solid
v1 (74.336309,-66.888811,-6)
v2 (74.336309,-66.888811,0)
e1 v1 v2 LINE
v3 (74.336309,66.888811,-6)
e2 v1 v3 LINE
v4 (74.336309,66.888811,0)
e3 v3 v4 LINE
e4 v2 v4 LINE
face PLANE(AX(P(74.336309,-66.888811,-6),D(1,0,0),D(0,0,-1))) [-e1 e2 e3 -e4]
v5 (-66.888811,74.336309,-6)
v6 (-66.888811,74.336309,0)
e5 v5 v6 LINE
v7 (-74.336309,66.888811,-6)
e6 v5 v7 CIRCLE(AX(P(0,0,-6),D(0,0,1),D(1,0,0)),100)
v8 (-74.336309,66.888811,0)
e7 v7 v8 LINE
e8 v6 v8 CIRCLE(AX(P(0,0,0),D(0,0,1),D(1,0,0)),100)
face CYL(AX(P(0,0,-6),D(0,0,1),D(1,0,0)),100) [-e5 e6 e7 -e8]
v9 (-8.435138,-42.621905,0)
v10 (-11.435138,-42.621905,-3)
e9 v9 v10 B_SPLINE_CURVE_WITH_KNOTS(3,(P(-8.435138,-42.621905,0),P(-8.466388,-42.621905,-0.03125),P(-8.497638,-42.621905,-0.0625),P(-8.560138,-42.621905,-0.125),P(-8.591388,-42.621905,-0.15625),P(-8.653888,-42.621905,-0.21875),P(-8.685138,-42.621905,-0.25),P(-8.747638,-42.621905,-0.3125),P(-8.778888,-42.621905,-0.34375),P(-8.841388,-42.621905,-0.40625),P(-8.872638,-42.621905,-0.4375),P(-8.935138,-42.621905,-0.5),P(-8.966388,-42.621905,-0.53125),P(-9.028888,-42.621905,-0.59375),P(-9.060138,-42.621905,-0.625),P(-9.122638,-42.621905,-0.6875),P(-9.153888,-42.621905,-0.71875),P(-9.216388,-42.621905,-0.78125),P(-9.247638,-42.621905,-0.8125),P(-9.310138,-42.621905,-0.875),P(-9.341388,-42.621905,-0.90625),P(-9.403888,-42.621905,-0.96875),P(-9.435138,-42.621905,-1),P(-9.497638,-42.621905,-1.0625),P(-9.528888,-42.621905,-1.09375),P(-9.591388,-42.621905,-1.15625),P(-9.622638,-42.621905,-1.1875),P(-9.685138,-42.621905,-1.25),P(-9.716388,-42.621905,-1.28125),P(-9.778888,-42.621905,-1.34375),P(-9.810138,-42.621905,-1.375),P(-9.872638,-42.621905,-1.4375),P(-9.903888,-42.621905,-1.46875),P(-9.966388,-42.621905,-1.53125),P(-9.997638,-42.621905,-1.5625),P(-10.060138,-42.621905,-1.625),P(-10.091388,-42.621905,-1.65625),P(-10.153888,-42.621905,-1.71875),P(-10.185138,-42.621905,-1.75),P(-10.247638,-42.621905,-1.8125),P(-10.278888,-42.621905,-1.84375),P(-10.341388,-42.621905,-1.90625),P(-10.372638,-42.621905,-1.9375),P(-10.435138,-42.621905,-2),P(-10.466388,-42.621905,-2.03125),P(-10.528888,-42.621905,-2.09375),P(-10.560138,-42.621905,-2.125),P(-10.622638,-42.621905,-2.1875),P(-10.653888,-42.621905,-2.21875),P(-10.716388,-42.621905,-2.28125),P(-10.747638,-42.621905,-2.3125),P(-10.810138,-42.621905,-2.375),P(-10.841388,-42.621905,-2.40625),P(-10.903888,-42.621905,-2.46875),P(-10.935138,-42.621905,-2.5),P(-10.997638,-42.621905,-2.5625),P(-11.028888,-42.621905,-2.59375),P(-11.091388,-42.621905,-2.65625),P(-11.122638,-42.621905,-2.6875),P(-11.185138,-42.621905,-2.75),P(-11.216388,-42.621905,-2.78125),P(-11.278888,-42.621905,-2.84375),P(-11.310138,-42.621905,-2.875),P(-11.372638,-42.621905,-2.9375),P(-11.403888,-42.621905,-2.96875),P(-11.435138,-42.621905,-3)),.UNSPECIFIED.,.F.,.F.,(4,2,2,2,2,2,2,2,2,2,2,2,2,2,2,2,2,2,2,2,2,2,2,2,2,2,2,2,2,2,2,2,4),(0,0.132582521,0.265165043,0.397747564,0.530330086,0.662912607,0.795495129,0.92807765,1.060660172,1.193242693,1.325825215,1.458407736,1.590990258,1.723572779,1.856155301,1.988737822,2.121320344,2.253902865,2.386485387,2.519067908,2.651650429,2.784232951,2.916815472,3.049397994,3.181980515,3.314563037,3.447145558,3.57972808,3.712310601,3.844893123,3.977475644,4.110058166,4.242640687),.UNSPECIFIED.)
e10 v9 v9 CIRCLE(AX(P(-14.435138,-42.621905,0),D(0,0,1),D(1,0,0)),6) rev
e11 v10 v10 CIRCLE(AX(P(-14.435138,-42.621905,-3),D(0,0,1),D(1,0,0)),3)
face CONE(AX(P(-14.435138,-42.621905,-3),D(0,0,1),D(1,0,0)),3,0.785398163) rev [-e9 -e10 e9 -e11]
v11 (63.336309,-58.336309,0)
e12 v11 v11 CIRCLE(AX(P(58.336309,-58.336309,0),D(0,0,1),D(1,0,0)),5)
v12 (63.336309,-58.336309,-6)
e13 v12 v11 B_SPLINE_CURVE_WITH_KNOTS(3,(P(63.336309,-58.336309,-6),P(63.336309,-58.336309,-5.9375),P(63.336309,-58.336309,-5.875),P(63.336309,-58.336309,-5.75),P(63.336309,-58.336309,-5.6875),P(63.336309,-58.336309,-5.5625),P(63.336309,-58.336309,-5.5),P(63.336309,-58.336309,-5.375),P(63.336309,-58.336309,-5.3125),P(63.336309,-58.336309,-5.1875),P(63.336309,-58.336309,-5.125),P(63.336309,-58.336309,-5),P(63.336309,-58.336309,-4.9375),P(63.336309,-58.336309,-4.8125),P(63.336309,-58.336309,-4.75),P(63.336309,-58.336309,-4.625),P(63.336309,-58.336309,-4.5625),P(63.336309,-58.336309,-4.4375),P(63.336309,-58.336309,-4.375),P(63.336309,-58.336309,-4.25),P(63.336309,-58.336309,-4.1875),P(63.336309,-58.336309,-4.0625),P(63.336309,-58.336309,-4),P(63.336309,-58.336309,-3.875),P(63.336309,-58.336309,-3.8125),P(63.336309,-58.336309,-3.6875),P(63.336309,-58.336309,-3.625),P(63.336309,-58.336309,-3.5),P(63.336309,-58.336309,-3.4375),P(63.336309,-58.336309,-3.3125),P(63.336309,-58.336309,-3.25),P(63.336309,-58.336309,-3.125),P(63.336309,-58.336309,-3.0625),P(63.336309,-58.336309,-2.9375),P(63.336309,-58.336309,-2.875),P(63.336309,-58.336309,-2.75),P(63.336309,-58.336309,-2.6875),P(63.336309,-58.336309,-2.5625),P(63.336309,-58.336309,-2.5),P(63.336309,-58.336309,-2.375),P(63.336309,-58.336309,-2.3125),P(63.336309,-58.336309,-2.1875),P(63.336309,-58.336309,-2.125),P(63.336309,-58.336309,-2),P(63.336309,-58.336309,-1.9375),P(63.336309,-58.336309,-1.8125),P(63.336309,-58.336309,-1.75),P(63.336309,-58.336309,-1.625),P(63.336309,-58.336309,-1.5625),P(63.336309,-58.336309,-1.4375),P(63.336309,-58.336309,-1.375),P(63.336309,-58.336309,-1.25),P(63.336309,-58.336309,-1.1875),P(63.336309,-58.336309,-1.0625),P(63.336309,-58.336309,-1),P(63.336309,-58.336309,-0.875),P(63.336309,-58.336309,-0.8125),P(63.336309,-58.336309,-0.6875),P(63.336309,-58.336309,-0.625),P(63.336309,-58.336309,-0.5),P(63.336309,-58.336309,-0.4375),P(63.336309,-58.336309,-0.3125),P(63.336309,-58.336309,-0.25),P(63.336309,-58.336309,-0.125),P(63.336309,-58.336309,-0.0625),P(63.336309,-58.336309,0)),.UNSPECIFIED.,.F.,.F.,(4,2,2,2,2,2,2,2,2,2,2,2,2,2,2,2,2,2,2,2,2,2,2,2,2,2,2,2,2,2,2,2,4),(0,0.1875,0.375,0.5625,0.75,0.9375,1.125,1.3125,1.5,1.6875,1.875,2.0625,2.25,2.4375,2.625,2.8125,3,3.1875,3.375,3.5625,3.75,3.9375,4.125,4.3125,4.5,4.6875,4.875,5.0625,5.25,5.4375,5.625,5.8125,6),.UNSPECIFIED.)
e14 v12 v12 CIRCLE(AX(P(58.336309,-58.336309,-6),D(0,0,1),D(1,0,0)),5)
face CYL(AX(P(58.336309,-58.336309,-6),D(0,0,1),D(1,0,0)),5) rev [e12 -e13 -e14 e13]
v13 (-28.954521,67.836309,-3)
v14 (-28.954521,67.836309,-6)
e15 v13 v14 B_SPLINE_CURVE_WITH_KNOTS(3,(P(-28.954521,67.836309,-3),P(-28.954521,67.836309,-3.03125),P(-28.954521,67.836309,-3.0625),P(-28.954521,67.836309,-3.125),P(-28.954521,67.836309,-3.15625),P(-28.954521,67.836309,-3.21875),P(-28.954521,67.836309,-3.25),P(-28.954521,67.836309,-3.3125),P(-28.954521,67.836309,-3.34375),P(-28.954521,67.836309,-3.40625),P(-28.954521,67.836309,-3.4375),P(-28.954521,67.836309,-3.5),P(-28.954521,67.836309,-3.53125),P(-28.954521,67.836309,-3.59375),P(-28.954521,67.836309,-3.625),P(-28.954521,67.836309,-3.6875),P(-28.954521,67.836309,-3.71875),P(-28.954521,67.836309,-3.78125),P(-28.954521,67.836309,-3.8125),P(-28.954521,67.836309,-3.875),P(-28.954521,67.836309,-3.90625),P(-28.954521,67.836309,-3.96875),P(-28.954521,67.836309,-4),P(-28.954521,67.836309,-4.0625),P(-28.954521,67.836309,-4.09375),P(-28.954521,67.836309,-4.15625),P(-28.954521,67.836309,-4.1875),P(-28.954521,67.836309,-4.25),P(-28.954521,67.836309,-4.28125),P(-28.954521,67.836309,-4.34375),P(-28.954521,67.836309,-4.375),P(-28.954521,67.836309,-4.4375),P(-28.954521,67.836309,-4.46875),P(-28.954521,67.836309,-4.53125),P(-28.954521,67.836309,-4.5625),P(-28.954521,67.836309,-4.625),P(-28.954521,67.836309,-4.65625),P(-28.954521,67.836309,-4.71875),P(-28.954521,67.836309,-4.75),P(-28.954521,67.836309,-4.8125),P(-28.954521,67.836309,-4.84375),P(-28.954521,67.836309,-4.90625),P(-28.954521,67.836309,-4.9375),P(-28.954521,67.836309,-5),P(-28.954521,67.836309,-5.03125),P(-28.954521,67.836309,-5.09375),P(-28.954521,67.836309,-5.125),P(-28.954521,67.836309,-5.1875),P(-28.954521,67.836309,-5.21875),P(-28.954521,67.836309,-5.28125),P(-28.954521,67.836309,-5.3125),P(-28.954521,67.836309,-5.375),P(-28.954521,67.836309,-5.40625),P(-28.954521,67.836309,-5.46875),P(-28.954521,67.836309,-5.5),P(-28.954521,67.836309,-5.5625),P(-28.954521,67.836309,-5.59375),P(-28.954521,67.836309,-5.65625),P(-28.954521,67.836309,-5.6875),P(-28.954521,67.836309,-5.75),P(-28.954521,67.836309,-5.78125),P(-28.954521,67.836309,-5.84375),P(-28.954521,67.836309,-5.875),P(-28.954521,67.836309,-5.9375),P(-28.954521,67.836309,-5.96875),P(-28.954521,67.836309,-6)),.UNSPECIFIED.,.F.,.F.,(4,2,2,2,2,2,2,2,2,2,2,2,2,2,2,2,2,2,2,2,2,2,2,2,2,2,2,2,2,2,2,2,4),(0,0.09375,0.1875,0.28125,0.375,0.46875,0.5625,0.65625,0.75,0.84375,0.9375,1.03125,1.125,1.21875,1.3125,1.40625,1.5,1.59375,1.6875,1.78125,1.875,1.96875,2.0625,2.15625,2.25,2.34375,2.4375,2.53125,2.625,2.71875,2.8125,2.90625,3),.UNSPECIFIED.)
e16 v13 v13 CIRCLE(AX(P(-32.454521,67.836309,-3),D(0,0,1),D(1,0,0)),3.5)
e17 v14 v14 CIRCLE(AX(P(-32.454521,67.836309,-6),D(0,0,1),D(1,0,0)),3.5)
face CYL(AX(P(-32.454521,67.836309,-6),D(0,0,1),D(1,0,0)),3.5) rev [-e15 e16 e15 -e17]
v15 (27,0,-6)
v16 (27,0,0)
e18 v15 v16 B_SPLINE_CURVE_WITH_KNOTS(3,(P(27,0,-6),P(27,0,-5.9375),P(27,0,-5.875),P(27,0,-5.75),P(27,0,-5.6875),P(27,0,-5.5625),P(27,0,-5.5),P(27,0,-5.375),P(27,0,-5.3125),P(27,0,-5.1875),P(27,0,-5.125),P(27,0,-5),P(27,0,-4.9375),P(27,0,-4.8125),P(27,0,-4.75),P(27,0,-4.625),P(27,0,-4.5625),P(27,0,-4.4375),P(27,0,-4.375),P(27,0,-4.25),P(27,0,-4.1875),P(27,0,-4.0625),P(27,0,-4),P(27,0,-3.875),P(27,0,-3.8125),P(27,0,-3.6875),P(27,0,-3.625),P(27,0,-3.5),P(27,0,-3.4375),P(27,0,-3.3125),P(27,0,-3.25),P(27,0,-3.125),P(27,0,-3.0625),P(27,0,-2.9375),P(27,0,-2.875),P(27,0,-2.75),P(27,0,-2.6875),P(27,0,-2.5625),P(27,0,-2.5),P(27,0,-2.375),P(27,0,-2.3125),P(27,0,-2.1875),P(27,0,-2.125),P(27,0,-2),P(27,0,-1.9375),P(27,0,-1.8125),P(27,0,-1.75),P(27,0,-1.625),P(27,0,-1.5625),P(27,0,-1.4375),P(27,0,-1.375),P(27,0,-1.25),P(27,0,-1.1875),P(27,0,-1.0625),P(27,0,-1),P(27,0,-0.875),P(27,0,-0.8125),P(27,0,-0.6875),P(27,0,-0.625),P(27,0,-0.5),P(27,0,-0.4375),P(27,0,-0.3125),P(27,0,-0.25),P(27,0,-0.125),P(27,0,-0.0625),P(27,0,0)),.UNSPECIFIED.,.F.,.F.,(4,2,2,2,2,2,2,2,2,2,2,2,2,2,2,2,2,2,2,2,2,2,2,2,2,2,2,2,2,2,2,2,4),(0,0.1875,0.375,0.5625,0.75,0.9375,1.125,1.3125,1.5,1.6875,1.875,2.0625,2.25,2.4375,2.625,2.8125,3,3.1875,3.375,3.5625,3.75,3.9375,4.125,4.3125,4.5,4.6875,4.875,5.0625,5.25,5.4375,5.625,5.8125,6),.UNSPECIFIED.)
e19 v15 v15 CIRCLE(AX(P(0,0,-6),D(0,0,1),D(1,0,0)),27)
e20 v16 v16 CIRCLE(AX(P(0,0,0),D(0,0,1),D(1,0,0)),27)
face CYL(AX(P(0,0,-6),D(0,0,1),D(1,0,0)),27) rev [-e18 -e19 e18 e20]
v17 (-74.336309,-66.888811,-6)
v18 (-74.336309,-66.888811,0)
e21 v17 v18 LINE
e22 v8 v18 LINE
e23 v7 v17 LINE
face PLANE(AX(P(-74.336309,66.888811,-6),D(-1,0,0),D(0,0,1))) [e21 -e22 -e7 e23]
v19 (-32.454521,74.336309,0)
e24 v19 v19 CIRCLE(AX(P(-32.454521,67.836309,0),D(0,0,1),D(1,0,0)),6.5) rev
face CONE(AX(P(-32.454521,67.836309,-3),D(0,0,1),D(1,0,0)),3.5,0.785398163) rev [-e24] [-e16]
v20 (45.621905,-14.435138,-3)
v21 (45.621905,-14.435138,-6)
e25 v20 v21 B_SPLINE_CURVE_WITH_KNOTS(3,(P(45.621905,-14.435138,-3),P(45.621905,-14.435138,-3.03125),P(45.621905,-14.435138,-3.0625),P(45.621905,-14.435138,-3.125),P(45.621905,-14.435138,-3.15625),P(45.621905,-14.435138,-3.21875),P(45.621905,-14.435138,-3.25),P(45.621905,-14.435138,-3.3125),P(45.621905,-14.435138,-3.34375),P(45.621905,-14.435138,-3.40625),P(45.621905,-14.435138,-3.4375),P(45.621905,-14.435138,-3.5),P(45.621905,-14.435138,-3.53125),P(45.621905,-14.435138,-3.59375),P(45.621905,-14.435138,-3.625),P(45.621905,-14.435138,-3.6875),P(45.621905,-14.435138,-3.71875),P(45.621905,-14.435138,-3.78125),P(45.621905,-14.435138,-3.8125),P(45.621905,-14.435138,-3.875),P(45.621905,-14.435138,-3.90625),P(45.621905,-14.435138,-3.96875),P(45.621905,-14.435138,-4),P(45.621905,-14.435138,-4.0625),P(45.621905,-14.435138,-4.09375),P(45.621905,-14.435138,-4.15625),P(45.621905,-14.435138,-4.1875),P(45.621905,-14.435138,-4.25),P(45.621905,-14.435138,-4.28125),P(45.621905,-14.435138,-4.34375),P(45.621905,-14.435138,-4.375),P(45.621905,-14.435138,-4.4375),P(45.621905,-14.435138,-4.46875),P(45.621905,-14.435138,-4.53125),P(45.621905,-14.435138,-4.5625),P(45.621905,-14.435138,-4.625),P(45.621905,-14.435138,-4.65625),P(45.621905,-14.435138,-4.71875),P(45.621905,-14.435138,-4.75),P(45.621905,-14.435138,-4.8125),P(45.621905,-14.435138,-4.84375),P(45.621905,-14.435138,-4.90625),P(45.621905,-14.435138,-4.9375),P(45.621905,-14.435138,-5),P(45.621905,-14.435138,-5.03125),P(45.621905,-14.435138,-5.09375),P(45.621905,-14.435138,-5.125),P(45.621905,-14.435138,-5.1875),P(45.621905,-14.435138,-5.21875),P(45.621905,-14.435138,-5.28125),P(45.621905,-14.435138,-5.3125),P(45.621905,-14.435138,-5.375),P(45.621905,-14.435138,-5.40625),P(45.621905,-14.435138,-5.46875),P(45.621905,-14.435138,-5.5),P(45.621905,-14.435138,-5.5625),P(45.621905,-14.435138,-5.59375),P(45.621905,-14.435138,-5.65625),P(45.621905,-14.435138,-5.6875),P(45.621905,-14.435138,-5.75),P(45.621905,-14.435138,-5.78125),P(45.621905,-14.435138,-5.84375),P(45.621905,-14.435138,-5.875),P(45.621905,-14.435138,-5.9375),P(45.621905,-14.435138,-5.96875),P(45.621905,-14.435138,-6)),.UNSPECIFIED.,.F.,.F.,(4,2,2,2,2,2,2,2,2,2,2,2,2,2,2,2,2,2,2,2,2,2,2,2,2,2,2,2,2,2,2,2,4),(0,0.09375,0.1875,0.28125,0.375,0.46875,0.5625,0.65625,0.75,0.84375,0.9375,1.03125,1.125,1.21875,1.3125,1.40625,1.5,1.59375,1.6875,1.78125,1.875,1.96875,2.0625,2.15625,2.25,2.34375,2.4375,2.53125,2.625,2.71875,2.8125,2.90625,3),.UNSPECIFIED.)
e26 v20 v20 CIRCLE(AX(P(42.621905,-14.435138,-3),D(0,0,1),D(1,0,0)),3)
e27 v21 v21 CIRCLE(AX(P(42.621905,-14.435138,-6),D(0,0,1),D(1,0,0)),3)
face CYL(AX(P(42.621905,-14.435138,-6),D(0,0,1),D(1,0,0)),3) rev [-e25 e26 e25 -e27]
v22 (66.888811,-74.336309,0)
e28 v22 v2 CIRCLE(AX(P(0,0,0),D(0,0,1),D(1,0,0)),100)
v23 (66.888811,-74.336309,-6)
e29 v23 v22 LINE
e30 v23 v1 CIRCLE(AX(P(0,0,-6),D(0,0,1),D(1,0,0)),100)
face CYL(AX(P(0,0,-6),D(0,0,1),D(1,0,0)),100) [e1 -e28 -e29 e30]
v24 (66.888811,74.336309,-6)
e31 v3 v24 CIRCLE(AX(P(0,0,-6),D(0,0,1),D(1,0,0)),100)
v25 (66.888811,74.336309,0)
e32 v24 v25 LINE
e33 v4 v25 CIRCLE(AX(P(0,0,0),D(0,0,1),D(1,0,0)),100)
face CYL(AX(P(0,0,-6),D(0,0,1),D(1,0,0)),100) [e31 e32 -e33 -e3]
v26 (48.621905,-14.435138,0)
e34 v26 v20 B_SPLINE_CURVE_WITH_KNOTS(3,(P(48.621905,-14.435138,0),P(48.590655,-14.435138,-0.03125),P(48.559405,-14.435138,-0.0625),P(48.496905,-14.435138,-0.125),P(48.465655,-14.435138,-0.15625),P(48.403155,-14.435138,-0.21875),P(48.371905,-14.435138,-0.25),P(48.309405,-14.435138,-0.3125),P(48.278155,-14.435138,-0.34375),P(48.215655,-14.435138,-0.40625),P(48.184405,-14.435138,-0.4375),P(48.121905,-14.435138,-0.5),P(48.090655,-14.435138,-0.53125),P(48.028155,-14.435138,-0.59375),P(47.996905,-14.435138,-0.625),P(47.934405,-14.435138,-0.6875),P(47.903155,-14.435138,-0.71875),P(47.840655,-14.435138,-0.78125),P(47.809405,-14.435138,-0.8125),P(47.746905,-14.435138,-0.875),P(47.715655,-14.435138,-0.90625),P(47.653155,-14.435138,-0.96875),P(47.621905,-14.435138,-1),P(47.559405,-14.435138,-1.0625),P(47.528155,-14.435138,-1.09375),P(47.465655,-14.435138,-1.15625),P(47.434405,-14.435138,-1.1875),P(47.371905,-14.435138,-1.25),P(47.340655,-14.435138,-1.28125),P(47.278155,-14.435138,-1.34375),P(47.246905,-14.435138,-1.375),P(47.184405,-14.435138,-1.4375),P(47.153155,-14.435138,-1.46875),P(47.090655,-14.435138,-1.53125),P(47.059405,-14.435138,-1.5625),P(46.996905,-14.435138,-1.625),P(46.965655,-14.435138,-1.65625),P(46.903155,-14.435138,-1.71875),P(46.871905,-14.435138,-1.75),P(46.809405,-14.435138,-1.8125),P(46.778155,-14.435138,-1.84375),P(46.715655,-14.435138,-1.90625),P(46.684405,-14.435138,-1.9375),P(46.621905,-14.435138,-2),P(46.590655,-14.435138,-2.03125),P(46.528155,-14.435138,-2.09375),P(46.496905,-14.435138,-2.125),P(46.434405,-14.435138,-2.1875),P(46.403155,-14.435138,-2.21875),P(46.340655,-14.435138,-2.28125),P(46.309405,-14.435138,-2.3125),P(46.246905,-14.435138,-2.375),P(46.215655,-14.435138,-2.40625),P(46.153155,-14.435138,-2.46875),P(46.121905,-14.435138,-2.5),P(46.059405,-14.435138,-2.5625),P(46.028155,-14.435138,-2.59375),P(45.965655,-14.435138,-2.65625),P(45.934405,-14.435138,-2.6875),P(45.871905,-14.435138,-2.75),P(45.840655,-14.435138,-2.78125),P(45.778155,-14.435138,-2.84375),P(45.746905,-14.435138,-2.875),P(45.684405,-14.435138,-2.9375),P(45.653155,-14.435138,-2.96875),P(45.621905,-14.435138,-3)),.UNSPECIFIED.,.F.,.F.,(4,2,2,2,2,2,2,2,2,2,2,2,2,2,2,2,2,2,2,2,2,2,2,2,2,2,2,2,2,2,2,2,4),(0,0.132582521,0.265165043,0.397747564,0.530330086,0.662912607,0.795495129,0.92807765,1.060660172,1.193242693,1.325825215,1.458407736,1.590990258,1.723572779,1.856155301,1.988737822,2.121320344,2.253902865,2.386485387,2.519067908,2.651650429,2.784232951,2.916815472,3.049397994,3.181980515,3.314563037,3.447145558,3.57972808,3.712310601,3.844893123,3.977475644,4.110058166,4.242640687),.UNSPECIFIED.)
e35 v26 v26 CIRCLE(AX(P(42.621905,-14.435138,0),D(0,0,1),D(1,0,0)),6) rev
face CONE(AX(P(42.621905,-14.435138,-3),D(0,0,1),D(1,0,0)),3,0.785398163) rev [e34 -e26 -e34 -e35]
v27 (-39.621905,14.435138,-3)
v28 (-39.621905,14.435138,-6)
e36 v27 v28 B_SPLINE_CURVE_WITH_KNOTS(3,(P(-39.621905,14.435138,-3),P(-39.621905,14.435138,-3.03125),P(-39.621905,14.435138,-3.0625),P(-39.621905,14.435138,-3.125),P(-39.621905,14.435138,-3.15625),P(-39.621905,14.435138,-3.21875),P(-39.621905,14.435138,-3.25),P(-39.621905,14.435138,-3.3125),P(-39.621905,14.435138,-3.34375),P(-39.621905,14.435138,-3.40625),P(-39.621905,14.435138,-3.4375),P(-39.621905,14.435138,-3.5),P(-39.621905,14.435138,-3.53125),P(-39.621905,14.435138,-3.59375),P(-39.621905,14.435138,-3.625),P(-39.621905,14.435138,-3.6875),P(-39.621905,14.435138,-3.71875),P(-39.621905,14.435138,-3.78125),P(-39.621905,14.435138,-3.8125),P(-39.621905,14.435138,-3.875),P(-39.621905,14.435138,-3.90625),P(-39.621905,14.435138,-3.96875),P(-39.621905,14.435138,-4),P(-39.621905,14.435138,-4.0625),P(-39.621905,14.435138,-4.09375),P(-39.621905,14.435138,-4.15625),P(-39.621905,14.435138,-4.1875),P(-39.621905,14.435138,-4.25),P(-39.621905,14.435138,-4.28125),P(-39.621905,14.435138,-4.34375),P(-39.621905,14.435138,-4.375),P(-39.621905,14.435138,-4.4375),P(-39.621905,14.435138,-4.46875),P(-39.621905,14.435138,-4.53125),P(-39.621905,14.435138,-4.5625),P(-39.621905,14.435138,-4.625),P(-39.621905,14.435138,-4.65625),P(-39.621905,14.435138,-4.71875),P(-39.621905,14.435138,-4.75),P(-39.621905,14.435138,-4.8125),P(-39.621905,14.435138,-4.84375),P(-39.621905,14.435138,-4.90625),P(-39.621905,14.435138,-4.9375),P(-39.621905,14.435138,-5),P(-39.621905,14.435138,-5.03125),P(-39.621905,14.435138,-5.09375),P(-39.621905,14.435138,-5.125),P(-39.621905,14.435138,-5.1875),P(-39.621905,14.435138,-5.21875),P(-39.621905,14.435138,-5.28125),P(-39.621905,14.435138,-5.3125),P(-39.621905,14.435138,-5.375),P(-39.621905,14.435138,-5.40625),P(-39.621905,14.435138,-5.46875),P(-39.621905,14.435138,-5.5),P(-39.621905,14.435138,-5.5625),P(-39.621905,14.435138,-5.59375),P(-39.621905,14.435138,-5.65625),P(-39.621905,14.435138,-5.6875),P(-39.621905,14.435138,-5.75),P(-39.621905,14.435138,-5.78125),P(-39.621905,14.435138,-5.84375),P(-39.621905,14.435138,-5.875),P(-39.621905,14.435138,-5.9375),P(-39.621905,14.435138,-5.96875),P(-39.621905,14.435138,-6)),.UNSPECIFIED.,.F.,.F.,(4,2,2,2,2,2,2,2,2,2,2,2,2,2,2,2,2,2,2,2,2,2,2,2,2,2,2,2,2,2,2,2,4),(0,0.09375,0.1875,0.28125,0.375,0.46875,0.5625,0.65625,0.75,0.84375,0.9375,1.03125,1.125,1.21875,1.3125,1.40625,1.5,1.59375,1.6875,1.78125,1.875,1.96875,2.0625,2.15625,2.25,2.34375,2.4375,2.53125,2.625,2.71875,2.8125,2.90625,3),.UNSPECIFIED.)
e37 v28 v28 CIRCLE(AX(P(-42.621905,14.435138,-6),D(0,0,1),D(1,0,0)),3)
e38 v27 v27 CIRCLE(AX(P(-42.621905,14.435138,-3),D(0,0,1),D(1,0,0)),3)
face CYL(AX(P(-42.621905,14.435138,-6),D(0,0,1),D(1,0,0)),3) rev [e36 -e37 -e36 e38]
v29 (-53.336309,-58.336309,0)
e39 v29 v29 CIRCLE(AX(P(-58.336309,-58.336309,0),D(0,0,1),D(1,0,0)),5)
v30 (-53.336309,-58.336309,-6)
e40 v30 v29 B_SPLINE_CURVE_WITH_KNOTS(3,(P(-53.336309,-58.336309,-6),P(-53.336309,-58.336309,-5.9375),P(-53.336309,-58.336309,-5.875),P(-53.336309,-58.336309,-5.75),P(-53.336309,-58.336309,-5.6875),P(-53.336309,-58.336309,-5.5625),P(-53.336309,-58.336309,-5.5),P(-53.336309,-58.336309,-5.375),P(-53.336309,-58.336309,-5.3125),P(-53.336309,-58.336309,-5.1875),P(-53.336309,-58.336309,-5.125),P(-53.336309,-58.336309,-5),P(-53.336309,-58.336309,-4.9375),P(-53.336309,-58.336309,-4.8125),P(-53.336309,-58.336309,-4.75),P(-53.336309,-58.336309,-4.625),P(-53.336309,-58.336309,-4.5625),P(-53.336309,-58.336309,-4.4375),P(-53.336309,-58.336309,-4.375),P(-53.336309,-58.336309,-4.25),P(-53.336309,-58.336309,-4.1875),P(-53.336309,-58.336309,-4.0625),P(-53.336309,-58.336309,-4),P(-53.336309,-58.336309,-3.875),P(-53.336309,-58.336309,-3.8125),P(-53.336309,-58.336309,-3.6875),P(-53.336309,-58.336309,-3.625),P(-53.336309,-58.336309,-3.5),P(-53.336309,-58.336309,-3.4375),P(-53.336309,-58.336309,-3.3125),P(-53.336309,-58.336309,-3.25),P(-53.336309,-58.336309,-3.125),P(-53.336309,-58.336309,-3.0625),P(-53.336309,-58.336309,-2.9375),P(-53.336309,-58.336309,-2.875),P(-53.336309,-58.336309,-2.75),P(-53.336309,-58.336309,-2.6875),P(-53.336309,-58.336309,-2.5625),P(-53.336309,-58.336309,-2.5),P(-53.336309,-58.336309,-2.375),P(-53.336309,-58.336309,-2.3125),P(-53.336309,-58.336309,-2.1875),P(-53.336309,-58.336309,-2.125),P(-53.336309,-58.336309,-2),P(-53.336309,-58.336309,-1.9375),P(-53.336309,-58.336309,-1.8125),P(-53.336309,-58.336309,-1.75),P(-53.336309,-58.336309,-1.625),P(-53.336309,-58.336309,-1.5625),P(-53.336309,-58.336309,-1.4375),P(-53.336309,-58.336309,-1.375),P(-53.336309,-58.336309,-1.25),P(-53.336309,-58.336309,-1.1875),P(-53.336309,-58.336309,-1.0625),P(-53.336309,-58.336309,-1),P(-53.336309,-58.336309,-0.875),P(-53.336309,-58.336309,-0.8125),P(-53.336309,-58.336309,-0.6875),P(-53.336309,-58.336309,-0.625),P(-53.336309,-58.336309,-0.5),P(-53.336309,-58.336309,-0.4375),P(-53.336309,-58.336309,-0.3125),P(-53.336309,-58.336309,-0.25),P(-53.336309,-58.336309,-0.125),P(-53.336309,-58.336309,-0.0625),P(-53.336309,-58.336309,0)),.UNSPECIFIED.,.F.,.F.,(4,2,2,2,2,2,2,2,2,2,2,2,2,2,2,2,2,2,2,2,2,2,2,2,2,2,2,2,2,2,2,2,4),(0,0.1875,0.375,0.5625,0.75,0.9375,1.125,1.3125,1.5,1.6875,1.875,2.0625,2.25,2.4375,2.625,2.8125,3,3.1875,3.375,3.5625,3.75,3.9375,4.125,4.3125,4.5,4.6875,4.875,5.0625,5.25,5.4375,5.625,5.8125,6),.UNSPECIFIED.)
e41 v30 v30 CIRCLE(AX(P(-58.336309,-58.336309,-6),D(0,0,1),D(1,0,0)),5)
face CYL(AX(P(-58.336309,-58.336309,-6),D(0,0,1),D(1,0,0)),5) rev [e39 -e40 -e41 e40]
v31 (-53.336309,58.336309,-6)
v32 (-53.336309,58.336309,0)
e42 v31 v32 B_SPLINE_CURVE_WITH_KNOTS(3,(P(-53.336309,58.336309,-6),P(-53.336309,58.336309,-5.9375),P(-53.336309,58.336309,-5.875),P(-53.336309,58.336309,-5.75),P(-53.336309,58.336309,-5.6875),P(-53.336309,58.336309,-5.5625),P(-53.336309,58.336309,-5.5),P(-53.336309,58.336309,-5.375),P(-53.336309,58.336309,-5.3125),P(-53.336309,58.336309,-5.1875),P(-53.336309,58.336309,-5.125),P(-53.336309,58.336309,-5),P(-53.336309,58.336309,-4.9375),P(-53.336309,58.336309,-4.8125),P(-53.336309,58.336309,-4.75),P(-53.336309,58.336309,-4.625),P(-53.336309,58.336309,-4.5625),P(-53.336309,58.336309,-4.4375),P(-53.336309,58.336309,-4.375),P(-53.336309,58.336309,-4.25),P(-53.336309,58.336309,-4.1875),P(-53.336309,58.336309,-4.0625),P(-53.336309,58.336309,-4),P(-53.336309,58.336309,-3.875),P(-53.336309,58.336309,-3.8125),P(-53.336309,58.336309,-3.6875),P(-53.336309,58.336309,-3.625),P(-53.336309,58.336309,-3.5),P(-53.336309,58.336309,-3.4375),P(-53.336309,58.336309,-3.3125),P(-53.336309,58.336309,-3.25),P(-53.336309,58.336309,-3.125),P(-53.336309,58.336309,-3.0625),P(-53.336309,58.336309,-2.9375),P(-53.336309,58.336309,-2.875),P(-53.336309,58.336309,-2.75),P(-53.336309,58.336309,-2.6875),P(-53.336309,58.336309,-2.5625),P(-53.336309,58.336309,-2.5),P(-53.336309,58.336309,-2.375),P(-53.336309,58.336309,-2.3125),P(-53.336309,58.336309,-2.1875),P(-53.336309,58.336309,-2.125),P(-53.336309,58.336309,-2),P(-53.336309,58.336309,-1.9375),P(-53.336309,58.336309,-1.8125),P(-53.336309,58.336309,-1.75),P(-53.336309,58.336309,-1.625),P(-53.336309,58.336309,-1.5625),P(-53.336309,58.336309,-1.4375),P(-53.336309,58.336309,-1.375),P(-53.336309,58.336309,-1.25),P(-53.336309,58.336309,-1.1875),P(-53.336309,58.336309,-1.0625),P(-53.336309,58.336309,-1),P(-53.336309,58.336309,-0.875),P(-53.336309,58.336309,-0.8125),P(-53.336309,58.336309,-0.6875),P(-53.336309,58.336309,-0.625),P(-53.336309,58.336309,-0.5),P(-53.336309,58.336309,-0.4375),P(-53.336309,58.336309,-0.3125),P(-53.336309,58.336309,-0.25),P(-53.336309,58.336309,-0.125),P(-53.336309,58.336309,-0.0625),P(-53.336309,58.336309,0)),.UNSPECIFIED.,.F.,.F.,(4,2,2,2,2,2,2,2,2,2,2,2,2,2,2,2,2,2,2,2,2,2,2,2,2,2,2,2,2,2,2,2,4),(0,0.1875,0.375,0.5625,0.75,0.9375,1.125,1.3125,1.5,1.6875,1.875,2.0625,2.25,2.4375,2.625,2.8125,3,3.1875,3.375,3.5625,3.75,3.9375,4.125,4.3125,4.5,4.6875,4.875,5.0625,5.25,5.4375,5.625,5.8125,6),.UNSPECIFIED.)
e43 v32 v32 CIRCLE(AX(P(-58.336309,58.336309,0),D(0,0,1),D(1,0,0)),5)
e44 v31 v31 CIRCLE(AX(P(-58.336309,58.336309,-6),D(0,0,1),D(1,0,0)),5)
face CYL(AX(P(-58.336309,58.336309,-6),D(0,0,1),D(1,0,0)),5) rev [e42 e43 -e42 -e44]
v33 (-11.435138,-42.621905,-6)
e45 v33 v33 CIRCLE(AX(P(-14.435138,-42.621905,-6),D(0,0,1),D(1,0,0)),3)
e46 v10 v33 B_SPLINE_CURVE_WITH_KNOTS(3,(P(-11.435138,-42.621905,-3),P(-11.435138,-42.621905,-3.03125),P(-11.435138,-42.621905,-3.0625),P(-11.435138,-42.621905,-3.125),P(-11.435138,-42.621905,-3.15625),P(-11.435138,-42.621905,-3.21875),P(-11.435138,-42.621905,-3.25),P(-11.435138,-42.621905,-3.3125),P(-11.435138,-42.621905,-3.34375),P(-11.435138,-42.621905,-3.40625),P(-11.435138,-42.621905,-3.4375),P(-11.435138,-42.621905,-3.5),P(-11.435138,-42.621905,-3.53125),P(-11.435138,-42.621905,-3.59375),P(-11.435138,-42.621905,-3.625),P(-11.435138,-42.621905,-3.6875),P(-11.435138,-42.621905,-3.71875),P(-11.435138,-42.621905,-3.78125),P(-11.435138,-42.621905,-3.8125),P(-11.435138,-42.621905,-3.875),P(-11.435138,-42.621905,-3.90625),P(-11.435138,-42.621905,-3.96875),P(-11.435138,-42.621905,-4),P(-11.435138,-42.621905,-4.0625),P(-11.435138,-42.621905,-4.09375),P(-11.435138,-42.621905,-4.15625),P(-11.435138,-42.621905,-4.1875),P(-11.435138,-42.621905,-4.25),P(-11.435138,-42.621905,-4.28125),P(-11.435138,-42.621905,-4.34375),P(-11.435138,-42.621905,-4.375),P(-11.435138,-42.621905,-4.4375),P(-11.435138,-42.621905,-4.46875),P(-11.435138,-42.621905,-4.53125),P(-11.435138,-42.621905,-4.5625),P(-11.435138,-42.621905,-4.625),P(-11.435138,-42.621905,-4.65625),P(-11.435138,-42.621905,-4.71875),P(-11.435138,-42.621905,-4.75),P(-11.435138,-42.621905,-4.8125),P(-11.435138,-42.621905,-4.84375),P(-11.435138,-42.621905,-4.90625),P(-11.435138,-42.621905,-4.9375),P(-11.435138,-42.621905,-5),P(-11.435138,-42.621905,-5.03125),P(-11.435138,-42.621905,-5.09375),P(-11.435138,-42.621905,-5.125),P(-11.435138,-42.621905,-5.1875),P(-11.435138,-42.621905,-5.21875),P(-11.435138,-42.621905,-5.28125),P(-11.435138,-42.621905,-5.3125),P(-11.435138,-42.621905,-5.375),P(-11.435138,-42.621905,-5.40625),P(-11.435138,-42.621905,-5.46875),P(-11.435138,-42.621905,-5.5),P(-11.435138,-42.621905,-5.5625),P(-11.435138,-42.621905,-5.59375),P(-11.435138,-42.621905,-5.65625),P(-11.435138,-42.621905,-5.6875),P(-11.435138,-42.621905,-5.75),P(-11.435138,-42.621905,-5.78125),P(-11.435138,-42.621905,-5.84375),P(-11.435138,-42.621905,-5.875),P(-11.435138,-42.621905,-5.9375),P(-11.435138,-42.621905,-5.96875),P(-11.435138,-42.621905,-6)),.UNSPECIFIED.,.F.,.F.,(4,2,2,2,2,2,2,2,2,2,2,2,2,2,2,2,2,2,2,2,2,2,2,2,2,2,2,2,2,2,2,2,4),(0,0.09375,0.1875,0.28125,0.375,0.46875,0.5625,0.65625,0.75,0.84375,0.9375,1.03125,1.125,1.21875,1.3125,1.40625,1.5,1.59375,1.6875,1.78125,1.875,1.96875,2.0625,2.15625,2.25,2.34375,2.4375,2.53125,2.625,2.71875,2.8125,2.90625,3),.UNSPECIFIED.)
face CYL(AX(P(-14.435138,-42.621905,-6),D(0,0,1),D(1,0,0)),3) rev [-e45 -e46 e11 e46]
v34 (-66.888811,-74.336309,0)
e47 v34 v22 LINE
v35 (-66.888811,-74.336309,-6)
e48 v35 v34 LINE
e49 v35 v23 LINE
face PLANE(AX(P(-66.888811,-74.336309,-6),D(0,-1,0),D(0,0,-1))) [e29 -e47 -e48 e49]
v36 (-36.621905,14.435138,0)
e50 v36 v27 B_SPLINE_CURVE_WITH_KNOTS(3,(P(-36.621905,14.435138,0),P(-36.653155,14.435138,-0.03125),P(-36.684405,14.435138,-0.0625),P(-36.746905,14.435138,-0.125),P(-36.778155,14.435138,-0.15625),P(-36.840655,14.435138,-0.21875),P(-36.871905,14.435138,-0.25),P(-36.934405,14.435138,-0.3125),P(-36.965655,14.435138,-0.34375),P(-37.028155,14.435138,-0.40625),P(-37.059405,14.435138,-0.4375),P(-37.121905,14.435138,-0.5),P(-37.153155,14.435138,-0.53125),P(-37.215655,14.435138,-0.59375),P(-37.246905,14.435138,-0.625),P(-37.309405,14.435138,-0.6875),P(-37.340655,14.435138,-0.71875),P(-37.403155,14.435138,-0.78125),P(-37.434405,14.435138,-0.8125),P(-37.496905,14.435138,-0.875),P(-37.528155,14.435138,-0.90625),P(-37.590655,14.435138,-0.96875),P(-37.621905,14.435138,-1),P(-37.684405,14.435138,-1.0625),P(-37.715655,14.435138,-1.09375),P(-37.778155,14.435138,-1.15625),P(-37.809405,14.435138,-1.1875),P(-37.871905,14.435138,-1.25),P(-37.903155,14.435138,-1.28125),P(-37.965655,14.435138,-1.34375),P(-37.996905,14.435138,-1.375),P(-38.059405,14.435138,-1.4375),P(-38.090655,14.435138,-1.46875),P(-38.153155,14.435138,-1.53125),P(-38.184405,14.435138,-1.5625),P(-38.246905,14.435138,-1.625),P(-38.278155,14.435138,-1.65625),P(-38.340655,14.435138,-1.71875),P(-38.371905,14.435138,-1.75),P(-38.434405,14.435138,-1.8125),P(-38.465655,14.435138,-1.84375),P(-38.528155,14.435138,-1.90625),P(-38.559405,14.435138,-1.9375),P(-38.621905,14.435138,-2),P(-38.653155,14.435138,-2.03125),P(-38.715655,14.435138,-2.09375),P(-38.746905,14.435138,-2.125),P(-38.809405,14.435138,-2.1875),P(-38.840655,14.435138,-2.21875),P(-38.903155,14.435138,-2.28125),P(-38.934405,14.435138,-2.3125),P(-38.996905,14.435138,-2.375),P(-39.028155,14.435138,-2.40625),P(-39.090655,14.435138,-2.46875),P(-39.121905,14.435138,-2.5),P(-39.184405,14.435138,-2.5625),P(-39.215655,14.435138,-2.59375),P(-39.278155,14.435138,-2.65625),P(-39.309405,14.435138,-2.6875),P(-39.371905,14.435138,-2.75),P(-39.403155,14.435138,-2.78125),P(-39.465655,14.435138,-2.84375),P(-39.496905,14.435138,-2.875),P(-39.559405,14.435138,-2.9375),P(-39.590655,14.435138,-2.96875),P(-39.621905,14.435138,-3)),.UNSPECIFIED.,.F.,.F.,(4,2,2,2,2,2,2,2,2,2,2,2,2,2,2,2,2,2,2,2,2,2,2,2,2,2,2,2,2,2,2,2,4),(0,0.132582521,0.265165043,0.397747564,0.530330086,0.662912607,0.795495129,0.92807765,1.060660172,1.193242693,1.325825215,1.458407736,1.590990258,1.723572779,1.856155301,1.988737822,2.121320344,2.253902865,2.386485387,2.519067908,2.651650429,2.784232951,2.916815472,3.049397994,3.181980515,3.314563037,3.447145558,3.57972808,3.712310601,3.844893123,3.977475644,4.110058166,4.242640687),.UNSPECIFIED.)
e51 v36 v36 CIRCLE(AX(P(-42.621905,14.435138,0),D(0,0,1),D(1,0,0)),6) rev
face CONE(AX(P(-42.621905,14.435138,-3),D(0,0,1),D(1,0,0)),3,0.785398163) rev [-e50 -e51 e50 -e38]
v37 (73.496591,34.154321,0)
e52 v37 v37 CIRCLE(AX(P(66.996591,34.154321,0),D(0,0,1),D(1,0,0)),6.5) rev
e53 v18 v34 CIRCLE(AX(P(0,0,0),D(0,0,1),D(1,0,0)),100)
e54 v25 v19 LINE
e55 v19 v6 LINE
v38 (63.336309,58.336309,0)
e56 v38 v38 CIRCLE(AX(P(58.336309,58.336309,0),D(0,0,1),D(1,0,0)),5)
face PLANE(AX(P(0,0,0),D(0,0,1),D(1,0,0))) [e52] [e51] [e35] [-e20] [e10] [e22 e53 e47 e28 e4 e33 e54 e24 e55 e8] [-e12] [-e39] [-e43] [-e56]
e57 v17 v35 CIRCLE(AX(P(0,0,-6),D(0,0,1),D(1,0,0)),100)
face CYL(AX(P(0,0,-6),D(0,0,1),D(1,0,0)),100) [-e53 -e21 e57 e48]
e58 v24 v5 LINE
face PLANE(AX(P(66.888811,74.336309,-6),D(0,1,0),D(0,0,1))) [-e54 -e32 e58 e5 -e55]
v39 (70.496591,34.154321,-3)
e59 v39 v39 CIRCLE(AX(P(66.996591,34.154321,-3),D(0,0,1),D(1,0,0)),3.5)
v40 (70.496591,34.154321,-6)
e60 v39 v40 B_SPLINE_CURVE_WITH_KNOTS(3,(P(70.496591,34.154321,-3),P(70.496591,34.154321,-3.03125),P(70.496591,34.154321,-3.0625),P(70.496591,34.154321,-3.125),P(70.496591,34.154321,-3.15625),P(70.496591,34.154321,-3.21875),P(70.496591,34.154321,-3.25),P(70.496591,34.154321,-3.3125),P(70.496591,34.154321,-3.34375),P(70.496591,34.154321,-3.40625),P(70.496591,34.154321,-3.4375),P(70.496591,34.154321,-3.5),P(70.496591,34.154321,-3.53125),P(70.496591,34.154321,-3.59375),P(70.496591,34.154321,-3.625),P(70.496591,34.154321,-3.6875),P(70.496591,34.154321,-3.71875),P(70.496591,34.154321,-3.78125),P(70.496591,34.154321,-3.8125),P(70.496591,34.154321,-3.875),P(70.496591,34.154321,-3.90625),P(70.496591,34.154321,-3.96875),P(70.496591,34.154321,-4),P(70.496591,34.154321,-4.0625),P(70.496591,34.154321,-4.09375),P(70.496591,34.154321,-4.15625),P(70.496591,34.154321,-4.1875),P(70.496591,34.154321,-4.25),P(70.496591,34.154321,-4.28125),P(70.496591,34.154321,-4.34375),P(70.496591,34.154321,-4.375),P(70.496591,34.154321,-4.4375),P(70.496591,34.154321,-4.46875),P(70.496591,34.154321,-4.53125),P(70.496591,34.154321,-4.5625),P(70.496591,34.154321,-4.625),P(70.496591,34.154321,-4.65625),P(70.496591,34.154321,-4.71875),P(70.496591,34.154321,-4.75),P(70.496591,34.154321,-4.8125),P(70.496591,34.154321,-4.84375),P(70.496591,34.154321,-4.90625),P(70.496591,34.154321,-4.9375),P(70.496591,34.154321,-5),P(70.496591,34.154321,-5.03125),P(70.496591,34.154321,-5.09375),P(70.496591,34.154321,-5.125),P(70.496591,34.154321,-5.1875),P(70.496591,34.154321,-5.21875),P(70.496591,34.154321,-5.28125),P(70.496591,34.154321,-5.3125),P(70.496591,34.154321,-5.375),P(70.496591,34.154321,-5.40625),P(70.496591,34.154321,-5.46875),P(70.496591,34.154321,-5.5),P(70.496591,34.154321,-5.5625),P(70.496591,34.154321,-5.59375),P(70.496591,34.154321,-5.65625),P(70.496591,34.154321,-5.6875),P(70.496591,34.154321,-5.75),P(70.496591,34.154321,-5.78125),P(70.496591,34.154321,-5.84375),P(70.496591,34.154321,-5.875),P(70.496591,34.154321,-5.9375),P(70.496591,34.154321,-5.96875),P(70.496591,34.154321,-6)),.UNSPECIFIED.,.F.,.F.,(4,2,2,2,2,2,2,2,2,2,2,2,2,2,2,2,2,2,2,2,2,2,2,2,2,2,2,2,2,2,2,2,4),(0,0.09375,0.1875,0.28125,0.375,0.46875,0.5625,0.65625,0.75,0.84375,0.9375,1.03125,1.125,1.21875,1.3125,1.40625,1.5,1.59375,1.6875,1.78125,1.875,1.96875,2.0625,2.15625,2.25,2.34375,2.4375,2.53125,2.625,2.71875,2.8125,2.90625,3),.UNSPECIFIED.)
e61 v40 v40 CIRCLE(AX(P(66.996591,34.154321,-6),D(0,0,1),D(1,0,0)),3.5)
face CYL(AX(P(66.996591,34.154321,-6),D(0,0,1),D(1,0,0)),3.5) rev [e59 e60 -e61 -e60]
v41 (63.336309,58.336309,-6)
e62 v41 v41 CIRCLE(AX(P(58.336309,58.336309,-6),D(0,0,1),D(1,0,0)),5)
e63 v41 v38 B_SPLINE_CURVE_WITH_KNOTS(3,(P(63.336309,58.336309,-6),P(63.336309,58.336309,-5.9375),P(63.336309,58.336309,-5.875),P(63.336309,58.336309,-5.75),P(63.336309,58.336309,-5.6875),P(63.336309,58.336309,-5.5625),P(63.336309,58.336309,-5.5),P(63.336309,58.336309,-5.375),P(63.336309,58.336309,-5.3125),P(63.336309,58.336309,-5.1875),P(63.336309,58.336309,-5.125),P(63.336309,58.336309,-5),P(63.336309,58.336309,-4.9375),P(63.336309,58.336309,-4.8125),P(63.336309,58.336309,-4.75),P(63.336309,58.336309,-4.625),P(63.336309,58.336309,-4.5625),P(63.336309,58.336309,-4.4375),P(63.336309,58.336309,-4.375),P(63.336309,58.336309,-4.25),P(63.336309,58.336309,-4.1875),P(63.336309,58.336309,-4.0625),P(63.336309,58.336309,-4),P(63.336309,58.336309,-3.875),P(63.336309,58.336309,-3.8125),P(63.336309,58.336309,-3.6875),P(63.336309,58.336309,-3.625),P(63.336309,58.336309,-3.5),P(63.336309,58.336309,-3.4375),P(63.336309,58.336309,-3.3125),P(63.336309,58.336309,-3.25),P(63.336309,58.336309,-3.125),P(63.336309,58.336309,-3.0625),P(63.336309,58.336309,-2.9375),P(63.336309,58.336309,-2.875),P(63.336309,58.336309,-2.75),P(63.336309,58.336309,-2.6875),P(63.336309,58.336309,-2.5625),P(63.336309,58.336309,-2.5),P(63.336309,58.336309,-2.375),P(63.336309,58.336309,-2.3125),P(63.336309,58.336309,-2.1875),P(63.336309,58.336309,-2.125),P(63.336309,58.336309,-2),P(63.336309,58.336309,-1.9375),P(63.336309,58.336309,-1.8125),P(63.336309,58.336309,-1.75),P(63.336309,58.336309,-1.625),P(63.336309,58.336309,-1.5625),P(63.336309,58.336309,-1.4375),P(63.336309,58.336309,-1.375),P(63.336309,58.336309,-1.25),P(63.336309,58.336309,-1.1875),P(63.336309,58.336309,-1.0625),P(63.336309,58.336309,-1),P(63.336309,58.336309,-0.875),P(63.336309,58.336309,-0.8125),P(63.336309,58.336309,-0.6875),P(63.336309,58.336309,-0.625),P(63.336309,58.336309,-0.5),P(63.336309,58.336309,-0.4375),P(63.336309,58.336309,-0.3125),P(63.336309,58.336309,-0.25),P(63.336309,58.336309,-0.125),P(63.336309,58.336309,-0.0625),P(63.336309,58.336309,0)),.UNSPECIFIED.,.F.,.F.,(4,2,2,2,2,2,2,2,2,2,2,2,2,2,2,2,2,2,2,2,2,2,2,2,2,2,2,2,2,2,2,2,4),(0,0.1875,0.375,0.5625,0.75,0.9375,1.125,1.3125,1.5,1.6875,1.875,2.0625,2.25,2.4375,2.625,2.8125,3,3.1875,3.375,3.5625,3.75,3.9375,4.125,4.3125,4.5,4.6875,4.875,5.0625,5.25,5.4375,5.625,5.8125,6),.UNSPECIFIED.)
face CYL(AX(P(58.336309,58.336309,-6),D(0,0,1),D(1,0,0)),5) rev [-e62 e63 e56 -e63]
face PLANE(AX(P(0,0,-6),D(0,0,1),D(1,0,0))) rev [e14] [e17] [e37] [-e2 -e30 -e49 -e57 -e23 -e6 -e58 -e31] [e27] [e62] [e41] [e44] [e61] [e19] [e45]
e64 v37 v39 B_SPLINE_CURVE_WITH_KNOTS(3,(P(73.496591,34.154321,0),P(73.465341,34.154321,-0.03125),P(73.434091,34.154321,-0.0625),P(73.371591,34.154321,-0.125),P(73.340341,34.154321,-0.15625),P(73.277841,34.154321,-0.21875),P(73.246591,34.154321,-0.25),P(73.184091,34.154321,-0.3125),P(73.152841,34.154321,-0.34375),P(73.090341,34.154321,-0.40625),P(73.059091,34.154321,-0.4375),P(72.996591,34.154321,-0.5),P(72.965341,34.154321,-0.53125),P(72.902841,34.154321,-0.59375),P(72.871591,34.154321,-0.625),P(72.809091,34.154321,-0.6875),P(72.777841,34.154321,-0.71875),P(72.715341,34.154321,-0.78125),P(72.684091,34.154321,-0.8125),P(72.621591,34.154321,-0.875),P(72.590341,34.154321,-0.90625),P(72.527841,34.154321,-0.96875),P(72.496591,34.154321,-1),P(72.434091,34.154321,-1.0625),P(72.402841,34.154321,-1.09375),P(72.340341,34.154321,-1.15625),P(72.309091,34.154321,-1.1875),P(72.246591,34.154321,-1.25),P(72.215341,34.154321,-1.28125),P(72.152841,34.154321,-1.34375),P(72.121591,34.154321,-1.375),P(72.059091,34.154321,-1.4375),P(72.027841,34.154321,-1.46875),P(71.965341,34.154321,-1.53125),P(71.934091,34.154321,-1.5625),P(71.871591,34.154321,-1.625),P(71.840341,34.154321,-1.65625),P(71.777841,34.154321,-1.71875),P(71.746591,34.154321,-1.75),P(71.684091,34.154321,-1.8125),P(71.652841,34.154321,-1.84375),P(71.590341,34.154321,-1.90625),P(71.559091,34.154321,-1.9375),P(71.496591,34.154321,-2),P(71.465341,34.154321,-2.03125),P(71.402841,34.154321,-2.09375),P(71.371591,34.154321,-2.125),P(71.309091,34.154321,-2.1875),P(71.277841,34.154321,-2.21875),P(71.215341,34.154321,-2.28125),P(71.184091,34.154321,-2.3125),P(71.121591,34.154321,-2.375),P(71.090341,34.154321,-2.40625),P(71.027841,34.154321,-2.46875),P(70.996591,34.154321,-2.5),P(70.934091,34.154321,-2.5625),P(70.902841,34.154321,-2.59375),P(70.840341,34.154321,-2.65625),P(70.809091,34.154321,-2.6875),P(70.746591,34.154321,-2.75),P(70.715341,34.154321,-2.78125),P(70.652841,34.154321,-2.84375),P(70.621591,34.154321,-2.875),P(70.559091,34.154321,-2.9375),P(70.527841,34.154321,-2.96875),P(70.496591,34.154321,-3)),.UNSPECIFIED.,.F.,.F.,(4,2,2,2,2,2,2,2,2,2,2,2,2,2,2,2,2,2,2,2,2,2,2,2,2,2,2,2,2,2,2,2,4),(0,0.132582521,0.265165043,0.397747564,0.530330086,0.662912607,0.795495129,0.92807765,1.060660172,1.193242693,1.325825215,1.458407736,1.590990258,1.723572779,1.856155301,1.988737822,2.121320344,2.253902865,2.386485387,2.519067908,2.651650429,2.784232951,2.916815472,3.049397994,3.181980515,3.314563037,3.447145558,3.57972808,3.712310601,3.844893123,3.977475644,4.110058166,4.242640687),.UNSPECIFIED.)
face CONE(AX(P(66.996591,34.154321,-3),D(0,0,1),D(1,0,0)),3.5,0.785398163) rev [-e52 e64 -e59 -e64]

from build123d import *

# Parameters (mm, degrees)
SKETCH_1_R             = 5
SKETCH_1_R_2           = 27
SM_BASE_FLANGE_1_DEPTH = 6
SKETCH_6_R             = 3.5
SKETCH_6_R_2           = 3
CUT_EXTRUDE_1_DEPTH    = 106.298498587
CHAMFER_1_SIZE         = 3


# Sheet-metal steps are written as plain solids
with BuildPart() as part:
    # Sketch 1 → Базовая кромка1 (new body)
    with BuildSketch(Plane.XY):
        with BuildLine():
            Line((74.336309448, -66.888811454), (74.336309448, 66.888811454))
            ThreePointArc((74.336309448, 66.888811454), (70.710678119, 70.710678119), (66.888811454, 74.336309448))
            Line((66.888811454, 74.336309448), (-66.888811454, 74.336309448))
            ThreePointArc((-66.888811454, 74.336309448), (-70.710678119, 70.710678119), (-74.336309448, 66.888811454))
            Line((-74.336309448, 66.888811454), (-74.336309448, -66.888811454))
            ThreePointArc((-74.336309448, -66.888811454), (-70.710678119, -70.710678119), (-66.888811454, -74.336309448))
            Line((-66.888811454, -74.336309448), (66.888811454, -74.336309448))
            ThreePointArc((66.888811454, -74.336309448), (70.710678119, -70.710678119), (74.336309448, -66.888811454))
        make_face()
        with Locations((-58.336309448, -58.336309448)):
            Circle(SKETCH_1_R, mode=Mode.SUBTRACT)
        with Locations((-58.336309448, 58.336309448)):
            Circle(SKETCH_1_R, mode=Mode.SUBTRACT)
        with Locations((58.336309448, 58.336309448)):
            Circle(SKETCH_1_R, mode=Mode.SUBTRACT)
        with Locations((58.336309448, -58.336309448)):
            Circle(SKETCH_1_R, mode=Mode.SUBTRACT)
        Circle(SKETCH_1_R_2, mode=Mode.SUBTRACT)
    extrude(amount=-SM_BASE_FLANGE_1_DEPTH)

    # Эскиз6 → Вырез-Вытянуть1 (cut, through all)
    with BuildSketch(Plane.XY):
        with Locations((-32.454521271, 67.836309448)):
            Circle(SKETCH_6_R)
        with Locations((-42.621905135, 14.435137777)):
            Circle(SKETCH_6_R_2)
        with Locations((-14.435137777, -42.621905135)):
            Circle(SKETCH_6_R_2)
        with Locations((42.621905135, -14.435137777)):
            Circle(SKETCH_6_R_2)
        with Locations((66.996590711, 34.154321301)):
            Circle(SKETCH_6_R)
    extrude(amount=-CUT_EXTRUDE_1_DEPTH, mode=Mode.SUBTRACT)

    # Фаска1
    chamfer_1_edges = [part.edges().sort_by_distance(p)[0] for p in [
        (-35.954521271, 67.836309448, 0),
        (-45.621905135, 14.435137777, 0),
        (-17.435137777, -42.621905135, 0),
        (39.621905135, -14.435137777, 0),
        (63.496590711, 34.154321301, 0),
    ]]
    chamfer(chamfer_1_edges, length=CHAMFER_1_SIZE - 0.0001)  # a hair under: the kernel refuses the full size


solid = part.part
